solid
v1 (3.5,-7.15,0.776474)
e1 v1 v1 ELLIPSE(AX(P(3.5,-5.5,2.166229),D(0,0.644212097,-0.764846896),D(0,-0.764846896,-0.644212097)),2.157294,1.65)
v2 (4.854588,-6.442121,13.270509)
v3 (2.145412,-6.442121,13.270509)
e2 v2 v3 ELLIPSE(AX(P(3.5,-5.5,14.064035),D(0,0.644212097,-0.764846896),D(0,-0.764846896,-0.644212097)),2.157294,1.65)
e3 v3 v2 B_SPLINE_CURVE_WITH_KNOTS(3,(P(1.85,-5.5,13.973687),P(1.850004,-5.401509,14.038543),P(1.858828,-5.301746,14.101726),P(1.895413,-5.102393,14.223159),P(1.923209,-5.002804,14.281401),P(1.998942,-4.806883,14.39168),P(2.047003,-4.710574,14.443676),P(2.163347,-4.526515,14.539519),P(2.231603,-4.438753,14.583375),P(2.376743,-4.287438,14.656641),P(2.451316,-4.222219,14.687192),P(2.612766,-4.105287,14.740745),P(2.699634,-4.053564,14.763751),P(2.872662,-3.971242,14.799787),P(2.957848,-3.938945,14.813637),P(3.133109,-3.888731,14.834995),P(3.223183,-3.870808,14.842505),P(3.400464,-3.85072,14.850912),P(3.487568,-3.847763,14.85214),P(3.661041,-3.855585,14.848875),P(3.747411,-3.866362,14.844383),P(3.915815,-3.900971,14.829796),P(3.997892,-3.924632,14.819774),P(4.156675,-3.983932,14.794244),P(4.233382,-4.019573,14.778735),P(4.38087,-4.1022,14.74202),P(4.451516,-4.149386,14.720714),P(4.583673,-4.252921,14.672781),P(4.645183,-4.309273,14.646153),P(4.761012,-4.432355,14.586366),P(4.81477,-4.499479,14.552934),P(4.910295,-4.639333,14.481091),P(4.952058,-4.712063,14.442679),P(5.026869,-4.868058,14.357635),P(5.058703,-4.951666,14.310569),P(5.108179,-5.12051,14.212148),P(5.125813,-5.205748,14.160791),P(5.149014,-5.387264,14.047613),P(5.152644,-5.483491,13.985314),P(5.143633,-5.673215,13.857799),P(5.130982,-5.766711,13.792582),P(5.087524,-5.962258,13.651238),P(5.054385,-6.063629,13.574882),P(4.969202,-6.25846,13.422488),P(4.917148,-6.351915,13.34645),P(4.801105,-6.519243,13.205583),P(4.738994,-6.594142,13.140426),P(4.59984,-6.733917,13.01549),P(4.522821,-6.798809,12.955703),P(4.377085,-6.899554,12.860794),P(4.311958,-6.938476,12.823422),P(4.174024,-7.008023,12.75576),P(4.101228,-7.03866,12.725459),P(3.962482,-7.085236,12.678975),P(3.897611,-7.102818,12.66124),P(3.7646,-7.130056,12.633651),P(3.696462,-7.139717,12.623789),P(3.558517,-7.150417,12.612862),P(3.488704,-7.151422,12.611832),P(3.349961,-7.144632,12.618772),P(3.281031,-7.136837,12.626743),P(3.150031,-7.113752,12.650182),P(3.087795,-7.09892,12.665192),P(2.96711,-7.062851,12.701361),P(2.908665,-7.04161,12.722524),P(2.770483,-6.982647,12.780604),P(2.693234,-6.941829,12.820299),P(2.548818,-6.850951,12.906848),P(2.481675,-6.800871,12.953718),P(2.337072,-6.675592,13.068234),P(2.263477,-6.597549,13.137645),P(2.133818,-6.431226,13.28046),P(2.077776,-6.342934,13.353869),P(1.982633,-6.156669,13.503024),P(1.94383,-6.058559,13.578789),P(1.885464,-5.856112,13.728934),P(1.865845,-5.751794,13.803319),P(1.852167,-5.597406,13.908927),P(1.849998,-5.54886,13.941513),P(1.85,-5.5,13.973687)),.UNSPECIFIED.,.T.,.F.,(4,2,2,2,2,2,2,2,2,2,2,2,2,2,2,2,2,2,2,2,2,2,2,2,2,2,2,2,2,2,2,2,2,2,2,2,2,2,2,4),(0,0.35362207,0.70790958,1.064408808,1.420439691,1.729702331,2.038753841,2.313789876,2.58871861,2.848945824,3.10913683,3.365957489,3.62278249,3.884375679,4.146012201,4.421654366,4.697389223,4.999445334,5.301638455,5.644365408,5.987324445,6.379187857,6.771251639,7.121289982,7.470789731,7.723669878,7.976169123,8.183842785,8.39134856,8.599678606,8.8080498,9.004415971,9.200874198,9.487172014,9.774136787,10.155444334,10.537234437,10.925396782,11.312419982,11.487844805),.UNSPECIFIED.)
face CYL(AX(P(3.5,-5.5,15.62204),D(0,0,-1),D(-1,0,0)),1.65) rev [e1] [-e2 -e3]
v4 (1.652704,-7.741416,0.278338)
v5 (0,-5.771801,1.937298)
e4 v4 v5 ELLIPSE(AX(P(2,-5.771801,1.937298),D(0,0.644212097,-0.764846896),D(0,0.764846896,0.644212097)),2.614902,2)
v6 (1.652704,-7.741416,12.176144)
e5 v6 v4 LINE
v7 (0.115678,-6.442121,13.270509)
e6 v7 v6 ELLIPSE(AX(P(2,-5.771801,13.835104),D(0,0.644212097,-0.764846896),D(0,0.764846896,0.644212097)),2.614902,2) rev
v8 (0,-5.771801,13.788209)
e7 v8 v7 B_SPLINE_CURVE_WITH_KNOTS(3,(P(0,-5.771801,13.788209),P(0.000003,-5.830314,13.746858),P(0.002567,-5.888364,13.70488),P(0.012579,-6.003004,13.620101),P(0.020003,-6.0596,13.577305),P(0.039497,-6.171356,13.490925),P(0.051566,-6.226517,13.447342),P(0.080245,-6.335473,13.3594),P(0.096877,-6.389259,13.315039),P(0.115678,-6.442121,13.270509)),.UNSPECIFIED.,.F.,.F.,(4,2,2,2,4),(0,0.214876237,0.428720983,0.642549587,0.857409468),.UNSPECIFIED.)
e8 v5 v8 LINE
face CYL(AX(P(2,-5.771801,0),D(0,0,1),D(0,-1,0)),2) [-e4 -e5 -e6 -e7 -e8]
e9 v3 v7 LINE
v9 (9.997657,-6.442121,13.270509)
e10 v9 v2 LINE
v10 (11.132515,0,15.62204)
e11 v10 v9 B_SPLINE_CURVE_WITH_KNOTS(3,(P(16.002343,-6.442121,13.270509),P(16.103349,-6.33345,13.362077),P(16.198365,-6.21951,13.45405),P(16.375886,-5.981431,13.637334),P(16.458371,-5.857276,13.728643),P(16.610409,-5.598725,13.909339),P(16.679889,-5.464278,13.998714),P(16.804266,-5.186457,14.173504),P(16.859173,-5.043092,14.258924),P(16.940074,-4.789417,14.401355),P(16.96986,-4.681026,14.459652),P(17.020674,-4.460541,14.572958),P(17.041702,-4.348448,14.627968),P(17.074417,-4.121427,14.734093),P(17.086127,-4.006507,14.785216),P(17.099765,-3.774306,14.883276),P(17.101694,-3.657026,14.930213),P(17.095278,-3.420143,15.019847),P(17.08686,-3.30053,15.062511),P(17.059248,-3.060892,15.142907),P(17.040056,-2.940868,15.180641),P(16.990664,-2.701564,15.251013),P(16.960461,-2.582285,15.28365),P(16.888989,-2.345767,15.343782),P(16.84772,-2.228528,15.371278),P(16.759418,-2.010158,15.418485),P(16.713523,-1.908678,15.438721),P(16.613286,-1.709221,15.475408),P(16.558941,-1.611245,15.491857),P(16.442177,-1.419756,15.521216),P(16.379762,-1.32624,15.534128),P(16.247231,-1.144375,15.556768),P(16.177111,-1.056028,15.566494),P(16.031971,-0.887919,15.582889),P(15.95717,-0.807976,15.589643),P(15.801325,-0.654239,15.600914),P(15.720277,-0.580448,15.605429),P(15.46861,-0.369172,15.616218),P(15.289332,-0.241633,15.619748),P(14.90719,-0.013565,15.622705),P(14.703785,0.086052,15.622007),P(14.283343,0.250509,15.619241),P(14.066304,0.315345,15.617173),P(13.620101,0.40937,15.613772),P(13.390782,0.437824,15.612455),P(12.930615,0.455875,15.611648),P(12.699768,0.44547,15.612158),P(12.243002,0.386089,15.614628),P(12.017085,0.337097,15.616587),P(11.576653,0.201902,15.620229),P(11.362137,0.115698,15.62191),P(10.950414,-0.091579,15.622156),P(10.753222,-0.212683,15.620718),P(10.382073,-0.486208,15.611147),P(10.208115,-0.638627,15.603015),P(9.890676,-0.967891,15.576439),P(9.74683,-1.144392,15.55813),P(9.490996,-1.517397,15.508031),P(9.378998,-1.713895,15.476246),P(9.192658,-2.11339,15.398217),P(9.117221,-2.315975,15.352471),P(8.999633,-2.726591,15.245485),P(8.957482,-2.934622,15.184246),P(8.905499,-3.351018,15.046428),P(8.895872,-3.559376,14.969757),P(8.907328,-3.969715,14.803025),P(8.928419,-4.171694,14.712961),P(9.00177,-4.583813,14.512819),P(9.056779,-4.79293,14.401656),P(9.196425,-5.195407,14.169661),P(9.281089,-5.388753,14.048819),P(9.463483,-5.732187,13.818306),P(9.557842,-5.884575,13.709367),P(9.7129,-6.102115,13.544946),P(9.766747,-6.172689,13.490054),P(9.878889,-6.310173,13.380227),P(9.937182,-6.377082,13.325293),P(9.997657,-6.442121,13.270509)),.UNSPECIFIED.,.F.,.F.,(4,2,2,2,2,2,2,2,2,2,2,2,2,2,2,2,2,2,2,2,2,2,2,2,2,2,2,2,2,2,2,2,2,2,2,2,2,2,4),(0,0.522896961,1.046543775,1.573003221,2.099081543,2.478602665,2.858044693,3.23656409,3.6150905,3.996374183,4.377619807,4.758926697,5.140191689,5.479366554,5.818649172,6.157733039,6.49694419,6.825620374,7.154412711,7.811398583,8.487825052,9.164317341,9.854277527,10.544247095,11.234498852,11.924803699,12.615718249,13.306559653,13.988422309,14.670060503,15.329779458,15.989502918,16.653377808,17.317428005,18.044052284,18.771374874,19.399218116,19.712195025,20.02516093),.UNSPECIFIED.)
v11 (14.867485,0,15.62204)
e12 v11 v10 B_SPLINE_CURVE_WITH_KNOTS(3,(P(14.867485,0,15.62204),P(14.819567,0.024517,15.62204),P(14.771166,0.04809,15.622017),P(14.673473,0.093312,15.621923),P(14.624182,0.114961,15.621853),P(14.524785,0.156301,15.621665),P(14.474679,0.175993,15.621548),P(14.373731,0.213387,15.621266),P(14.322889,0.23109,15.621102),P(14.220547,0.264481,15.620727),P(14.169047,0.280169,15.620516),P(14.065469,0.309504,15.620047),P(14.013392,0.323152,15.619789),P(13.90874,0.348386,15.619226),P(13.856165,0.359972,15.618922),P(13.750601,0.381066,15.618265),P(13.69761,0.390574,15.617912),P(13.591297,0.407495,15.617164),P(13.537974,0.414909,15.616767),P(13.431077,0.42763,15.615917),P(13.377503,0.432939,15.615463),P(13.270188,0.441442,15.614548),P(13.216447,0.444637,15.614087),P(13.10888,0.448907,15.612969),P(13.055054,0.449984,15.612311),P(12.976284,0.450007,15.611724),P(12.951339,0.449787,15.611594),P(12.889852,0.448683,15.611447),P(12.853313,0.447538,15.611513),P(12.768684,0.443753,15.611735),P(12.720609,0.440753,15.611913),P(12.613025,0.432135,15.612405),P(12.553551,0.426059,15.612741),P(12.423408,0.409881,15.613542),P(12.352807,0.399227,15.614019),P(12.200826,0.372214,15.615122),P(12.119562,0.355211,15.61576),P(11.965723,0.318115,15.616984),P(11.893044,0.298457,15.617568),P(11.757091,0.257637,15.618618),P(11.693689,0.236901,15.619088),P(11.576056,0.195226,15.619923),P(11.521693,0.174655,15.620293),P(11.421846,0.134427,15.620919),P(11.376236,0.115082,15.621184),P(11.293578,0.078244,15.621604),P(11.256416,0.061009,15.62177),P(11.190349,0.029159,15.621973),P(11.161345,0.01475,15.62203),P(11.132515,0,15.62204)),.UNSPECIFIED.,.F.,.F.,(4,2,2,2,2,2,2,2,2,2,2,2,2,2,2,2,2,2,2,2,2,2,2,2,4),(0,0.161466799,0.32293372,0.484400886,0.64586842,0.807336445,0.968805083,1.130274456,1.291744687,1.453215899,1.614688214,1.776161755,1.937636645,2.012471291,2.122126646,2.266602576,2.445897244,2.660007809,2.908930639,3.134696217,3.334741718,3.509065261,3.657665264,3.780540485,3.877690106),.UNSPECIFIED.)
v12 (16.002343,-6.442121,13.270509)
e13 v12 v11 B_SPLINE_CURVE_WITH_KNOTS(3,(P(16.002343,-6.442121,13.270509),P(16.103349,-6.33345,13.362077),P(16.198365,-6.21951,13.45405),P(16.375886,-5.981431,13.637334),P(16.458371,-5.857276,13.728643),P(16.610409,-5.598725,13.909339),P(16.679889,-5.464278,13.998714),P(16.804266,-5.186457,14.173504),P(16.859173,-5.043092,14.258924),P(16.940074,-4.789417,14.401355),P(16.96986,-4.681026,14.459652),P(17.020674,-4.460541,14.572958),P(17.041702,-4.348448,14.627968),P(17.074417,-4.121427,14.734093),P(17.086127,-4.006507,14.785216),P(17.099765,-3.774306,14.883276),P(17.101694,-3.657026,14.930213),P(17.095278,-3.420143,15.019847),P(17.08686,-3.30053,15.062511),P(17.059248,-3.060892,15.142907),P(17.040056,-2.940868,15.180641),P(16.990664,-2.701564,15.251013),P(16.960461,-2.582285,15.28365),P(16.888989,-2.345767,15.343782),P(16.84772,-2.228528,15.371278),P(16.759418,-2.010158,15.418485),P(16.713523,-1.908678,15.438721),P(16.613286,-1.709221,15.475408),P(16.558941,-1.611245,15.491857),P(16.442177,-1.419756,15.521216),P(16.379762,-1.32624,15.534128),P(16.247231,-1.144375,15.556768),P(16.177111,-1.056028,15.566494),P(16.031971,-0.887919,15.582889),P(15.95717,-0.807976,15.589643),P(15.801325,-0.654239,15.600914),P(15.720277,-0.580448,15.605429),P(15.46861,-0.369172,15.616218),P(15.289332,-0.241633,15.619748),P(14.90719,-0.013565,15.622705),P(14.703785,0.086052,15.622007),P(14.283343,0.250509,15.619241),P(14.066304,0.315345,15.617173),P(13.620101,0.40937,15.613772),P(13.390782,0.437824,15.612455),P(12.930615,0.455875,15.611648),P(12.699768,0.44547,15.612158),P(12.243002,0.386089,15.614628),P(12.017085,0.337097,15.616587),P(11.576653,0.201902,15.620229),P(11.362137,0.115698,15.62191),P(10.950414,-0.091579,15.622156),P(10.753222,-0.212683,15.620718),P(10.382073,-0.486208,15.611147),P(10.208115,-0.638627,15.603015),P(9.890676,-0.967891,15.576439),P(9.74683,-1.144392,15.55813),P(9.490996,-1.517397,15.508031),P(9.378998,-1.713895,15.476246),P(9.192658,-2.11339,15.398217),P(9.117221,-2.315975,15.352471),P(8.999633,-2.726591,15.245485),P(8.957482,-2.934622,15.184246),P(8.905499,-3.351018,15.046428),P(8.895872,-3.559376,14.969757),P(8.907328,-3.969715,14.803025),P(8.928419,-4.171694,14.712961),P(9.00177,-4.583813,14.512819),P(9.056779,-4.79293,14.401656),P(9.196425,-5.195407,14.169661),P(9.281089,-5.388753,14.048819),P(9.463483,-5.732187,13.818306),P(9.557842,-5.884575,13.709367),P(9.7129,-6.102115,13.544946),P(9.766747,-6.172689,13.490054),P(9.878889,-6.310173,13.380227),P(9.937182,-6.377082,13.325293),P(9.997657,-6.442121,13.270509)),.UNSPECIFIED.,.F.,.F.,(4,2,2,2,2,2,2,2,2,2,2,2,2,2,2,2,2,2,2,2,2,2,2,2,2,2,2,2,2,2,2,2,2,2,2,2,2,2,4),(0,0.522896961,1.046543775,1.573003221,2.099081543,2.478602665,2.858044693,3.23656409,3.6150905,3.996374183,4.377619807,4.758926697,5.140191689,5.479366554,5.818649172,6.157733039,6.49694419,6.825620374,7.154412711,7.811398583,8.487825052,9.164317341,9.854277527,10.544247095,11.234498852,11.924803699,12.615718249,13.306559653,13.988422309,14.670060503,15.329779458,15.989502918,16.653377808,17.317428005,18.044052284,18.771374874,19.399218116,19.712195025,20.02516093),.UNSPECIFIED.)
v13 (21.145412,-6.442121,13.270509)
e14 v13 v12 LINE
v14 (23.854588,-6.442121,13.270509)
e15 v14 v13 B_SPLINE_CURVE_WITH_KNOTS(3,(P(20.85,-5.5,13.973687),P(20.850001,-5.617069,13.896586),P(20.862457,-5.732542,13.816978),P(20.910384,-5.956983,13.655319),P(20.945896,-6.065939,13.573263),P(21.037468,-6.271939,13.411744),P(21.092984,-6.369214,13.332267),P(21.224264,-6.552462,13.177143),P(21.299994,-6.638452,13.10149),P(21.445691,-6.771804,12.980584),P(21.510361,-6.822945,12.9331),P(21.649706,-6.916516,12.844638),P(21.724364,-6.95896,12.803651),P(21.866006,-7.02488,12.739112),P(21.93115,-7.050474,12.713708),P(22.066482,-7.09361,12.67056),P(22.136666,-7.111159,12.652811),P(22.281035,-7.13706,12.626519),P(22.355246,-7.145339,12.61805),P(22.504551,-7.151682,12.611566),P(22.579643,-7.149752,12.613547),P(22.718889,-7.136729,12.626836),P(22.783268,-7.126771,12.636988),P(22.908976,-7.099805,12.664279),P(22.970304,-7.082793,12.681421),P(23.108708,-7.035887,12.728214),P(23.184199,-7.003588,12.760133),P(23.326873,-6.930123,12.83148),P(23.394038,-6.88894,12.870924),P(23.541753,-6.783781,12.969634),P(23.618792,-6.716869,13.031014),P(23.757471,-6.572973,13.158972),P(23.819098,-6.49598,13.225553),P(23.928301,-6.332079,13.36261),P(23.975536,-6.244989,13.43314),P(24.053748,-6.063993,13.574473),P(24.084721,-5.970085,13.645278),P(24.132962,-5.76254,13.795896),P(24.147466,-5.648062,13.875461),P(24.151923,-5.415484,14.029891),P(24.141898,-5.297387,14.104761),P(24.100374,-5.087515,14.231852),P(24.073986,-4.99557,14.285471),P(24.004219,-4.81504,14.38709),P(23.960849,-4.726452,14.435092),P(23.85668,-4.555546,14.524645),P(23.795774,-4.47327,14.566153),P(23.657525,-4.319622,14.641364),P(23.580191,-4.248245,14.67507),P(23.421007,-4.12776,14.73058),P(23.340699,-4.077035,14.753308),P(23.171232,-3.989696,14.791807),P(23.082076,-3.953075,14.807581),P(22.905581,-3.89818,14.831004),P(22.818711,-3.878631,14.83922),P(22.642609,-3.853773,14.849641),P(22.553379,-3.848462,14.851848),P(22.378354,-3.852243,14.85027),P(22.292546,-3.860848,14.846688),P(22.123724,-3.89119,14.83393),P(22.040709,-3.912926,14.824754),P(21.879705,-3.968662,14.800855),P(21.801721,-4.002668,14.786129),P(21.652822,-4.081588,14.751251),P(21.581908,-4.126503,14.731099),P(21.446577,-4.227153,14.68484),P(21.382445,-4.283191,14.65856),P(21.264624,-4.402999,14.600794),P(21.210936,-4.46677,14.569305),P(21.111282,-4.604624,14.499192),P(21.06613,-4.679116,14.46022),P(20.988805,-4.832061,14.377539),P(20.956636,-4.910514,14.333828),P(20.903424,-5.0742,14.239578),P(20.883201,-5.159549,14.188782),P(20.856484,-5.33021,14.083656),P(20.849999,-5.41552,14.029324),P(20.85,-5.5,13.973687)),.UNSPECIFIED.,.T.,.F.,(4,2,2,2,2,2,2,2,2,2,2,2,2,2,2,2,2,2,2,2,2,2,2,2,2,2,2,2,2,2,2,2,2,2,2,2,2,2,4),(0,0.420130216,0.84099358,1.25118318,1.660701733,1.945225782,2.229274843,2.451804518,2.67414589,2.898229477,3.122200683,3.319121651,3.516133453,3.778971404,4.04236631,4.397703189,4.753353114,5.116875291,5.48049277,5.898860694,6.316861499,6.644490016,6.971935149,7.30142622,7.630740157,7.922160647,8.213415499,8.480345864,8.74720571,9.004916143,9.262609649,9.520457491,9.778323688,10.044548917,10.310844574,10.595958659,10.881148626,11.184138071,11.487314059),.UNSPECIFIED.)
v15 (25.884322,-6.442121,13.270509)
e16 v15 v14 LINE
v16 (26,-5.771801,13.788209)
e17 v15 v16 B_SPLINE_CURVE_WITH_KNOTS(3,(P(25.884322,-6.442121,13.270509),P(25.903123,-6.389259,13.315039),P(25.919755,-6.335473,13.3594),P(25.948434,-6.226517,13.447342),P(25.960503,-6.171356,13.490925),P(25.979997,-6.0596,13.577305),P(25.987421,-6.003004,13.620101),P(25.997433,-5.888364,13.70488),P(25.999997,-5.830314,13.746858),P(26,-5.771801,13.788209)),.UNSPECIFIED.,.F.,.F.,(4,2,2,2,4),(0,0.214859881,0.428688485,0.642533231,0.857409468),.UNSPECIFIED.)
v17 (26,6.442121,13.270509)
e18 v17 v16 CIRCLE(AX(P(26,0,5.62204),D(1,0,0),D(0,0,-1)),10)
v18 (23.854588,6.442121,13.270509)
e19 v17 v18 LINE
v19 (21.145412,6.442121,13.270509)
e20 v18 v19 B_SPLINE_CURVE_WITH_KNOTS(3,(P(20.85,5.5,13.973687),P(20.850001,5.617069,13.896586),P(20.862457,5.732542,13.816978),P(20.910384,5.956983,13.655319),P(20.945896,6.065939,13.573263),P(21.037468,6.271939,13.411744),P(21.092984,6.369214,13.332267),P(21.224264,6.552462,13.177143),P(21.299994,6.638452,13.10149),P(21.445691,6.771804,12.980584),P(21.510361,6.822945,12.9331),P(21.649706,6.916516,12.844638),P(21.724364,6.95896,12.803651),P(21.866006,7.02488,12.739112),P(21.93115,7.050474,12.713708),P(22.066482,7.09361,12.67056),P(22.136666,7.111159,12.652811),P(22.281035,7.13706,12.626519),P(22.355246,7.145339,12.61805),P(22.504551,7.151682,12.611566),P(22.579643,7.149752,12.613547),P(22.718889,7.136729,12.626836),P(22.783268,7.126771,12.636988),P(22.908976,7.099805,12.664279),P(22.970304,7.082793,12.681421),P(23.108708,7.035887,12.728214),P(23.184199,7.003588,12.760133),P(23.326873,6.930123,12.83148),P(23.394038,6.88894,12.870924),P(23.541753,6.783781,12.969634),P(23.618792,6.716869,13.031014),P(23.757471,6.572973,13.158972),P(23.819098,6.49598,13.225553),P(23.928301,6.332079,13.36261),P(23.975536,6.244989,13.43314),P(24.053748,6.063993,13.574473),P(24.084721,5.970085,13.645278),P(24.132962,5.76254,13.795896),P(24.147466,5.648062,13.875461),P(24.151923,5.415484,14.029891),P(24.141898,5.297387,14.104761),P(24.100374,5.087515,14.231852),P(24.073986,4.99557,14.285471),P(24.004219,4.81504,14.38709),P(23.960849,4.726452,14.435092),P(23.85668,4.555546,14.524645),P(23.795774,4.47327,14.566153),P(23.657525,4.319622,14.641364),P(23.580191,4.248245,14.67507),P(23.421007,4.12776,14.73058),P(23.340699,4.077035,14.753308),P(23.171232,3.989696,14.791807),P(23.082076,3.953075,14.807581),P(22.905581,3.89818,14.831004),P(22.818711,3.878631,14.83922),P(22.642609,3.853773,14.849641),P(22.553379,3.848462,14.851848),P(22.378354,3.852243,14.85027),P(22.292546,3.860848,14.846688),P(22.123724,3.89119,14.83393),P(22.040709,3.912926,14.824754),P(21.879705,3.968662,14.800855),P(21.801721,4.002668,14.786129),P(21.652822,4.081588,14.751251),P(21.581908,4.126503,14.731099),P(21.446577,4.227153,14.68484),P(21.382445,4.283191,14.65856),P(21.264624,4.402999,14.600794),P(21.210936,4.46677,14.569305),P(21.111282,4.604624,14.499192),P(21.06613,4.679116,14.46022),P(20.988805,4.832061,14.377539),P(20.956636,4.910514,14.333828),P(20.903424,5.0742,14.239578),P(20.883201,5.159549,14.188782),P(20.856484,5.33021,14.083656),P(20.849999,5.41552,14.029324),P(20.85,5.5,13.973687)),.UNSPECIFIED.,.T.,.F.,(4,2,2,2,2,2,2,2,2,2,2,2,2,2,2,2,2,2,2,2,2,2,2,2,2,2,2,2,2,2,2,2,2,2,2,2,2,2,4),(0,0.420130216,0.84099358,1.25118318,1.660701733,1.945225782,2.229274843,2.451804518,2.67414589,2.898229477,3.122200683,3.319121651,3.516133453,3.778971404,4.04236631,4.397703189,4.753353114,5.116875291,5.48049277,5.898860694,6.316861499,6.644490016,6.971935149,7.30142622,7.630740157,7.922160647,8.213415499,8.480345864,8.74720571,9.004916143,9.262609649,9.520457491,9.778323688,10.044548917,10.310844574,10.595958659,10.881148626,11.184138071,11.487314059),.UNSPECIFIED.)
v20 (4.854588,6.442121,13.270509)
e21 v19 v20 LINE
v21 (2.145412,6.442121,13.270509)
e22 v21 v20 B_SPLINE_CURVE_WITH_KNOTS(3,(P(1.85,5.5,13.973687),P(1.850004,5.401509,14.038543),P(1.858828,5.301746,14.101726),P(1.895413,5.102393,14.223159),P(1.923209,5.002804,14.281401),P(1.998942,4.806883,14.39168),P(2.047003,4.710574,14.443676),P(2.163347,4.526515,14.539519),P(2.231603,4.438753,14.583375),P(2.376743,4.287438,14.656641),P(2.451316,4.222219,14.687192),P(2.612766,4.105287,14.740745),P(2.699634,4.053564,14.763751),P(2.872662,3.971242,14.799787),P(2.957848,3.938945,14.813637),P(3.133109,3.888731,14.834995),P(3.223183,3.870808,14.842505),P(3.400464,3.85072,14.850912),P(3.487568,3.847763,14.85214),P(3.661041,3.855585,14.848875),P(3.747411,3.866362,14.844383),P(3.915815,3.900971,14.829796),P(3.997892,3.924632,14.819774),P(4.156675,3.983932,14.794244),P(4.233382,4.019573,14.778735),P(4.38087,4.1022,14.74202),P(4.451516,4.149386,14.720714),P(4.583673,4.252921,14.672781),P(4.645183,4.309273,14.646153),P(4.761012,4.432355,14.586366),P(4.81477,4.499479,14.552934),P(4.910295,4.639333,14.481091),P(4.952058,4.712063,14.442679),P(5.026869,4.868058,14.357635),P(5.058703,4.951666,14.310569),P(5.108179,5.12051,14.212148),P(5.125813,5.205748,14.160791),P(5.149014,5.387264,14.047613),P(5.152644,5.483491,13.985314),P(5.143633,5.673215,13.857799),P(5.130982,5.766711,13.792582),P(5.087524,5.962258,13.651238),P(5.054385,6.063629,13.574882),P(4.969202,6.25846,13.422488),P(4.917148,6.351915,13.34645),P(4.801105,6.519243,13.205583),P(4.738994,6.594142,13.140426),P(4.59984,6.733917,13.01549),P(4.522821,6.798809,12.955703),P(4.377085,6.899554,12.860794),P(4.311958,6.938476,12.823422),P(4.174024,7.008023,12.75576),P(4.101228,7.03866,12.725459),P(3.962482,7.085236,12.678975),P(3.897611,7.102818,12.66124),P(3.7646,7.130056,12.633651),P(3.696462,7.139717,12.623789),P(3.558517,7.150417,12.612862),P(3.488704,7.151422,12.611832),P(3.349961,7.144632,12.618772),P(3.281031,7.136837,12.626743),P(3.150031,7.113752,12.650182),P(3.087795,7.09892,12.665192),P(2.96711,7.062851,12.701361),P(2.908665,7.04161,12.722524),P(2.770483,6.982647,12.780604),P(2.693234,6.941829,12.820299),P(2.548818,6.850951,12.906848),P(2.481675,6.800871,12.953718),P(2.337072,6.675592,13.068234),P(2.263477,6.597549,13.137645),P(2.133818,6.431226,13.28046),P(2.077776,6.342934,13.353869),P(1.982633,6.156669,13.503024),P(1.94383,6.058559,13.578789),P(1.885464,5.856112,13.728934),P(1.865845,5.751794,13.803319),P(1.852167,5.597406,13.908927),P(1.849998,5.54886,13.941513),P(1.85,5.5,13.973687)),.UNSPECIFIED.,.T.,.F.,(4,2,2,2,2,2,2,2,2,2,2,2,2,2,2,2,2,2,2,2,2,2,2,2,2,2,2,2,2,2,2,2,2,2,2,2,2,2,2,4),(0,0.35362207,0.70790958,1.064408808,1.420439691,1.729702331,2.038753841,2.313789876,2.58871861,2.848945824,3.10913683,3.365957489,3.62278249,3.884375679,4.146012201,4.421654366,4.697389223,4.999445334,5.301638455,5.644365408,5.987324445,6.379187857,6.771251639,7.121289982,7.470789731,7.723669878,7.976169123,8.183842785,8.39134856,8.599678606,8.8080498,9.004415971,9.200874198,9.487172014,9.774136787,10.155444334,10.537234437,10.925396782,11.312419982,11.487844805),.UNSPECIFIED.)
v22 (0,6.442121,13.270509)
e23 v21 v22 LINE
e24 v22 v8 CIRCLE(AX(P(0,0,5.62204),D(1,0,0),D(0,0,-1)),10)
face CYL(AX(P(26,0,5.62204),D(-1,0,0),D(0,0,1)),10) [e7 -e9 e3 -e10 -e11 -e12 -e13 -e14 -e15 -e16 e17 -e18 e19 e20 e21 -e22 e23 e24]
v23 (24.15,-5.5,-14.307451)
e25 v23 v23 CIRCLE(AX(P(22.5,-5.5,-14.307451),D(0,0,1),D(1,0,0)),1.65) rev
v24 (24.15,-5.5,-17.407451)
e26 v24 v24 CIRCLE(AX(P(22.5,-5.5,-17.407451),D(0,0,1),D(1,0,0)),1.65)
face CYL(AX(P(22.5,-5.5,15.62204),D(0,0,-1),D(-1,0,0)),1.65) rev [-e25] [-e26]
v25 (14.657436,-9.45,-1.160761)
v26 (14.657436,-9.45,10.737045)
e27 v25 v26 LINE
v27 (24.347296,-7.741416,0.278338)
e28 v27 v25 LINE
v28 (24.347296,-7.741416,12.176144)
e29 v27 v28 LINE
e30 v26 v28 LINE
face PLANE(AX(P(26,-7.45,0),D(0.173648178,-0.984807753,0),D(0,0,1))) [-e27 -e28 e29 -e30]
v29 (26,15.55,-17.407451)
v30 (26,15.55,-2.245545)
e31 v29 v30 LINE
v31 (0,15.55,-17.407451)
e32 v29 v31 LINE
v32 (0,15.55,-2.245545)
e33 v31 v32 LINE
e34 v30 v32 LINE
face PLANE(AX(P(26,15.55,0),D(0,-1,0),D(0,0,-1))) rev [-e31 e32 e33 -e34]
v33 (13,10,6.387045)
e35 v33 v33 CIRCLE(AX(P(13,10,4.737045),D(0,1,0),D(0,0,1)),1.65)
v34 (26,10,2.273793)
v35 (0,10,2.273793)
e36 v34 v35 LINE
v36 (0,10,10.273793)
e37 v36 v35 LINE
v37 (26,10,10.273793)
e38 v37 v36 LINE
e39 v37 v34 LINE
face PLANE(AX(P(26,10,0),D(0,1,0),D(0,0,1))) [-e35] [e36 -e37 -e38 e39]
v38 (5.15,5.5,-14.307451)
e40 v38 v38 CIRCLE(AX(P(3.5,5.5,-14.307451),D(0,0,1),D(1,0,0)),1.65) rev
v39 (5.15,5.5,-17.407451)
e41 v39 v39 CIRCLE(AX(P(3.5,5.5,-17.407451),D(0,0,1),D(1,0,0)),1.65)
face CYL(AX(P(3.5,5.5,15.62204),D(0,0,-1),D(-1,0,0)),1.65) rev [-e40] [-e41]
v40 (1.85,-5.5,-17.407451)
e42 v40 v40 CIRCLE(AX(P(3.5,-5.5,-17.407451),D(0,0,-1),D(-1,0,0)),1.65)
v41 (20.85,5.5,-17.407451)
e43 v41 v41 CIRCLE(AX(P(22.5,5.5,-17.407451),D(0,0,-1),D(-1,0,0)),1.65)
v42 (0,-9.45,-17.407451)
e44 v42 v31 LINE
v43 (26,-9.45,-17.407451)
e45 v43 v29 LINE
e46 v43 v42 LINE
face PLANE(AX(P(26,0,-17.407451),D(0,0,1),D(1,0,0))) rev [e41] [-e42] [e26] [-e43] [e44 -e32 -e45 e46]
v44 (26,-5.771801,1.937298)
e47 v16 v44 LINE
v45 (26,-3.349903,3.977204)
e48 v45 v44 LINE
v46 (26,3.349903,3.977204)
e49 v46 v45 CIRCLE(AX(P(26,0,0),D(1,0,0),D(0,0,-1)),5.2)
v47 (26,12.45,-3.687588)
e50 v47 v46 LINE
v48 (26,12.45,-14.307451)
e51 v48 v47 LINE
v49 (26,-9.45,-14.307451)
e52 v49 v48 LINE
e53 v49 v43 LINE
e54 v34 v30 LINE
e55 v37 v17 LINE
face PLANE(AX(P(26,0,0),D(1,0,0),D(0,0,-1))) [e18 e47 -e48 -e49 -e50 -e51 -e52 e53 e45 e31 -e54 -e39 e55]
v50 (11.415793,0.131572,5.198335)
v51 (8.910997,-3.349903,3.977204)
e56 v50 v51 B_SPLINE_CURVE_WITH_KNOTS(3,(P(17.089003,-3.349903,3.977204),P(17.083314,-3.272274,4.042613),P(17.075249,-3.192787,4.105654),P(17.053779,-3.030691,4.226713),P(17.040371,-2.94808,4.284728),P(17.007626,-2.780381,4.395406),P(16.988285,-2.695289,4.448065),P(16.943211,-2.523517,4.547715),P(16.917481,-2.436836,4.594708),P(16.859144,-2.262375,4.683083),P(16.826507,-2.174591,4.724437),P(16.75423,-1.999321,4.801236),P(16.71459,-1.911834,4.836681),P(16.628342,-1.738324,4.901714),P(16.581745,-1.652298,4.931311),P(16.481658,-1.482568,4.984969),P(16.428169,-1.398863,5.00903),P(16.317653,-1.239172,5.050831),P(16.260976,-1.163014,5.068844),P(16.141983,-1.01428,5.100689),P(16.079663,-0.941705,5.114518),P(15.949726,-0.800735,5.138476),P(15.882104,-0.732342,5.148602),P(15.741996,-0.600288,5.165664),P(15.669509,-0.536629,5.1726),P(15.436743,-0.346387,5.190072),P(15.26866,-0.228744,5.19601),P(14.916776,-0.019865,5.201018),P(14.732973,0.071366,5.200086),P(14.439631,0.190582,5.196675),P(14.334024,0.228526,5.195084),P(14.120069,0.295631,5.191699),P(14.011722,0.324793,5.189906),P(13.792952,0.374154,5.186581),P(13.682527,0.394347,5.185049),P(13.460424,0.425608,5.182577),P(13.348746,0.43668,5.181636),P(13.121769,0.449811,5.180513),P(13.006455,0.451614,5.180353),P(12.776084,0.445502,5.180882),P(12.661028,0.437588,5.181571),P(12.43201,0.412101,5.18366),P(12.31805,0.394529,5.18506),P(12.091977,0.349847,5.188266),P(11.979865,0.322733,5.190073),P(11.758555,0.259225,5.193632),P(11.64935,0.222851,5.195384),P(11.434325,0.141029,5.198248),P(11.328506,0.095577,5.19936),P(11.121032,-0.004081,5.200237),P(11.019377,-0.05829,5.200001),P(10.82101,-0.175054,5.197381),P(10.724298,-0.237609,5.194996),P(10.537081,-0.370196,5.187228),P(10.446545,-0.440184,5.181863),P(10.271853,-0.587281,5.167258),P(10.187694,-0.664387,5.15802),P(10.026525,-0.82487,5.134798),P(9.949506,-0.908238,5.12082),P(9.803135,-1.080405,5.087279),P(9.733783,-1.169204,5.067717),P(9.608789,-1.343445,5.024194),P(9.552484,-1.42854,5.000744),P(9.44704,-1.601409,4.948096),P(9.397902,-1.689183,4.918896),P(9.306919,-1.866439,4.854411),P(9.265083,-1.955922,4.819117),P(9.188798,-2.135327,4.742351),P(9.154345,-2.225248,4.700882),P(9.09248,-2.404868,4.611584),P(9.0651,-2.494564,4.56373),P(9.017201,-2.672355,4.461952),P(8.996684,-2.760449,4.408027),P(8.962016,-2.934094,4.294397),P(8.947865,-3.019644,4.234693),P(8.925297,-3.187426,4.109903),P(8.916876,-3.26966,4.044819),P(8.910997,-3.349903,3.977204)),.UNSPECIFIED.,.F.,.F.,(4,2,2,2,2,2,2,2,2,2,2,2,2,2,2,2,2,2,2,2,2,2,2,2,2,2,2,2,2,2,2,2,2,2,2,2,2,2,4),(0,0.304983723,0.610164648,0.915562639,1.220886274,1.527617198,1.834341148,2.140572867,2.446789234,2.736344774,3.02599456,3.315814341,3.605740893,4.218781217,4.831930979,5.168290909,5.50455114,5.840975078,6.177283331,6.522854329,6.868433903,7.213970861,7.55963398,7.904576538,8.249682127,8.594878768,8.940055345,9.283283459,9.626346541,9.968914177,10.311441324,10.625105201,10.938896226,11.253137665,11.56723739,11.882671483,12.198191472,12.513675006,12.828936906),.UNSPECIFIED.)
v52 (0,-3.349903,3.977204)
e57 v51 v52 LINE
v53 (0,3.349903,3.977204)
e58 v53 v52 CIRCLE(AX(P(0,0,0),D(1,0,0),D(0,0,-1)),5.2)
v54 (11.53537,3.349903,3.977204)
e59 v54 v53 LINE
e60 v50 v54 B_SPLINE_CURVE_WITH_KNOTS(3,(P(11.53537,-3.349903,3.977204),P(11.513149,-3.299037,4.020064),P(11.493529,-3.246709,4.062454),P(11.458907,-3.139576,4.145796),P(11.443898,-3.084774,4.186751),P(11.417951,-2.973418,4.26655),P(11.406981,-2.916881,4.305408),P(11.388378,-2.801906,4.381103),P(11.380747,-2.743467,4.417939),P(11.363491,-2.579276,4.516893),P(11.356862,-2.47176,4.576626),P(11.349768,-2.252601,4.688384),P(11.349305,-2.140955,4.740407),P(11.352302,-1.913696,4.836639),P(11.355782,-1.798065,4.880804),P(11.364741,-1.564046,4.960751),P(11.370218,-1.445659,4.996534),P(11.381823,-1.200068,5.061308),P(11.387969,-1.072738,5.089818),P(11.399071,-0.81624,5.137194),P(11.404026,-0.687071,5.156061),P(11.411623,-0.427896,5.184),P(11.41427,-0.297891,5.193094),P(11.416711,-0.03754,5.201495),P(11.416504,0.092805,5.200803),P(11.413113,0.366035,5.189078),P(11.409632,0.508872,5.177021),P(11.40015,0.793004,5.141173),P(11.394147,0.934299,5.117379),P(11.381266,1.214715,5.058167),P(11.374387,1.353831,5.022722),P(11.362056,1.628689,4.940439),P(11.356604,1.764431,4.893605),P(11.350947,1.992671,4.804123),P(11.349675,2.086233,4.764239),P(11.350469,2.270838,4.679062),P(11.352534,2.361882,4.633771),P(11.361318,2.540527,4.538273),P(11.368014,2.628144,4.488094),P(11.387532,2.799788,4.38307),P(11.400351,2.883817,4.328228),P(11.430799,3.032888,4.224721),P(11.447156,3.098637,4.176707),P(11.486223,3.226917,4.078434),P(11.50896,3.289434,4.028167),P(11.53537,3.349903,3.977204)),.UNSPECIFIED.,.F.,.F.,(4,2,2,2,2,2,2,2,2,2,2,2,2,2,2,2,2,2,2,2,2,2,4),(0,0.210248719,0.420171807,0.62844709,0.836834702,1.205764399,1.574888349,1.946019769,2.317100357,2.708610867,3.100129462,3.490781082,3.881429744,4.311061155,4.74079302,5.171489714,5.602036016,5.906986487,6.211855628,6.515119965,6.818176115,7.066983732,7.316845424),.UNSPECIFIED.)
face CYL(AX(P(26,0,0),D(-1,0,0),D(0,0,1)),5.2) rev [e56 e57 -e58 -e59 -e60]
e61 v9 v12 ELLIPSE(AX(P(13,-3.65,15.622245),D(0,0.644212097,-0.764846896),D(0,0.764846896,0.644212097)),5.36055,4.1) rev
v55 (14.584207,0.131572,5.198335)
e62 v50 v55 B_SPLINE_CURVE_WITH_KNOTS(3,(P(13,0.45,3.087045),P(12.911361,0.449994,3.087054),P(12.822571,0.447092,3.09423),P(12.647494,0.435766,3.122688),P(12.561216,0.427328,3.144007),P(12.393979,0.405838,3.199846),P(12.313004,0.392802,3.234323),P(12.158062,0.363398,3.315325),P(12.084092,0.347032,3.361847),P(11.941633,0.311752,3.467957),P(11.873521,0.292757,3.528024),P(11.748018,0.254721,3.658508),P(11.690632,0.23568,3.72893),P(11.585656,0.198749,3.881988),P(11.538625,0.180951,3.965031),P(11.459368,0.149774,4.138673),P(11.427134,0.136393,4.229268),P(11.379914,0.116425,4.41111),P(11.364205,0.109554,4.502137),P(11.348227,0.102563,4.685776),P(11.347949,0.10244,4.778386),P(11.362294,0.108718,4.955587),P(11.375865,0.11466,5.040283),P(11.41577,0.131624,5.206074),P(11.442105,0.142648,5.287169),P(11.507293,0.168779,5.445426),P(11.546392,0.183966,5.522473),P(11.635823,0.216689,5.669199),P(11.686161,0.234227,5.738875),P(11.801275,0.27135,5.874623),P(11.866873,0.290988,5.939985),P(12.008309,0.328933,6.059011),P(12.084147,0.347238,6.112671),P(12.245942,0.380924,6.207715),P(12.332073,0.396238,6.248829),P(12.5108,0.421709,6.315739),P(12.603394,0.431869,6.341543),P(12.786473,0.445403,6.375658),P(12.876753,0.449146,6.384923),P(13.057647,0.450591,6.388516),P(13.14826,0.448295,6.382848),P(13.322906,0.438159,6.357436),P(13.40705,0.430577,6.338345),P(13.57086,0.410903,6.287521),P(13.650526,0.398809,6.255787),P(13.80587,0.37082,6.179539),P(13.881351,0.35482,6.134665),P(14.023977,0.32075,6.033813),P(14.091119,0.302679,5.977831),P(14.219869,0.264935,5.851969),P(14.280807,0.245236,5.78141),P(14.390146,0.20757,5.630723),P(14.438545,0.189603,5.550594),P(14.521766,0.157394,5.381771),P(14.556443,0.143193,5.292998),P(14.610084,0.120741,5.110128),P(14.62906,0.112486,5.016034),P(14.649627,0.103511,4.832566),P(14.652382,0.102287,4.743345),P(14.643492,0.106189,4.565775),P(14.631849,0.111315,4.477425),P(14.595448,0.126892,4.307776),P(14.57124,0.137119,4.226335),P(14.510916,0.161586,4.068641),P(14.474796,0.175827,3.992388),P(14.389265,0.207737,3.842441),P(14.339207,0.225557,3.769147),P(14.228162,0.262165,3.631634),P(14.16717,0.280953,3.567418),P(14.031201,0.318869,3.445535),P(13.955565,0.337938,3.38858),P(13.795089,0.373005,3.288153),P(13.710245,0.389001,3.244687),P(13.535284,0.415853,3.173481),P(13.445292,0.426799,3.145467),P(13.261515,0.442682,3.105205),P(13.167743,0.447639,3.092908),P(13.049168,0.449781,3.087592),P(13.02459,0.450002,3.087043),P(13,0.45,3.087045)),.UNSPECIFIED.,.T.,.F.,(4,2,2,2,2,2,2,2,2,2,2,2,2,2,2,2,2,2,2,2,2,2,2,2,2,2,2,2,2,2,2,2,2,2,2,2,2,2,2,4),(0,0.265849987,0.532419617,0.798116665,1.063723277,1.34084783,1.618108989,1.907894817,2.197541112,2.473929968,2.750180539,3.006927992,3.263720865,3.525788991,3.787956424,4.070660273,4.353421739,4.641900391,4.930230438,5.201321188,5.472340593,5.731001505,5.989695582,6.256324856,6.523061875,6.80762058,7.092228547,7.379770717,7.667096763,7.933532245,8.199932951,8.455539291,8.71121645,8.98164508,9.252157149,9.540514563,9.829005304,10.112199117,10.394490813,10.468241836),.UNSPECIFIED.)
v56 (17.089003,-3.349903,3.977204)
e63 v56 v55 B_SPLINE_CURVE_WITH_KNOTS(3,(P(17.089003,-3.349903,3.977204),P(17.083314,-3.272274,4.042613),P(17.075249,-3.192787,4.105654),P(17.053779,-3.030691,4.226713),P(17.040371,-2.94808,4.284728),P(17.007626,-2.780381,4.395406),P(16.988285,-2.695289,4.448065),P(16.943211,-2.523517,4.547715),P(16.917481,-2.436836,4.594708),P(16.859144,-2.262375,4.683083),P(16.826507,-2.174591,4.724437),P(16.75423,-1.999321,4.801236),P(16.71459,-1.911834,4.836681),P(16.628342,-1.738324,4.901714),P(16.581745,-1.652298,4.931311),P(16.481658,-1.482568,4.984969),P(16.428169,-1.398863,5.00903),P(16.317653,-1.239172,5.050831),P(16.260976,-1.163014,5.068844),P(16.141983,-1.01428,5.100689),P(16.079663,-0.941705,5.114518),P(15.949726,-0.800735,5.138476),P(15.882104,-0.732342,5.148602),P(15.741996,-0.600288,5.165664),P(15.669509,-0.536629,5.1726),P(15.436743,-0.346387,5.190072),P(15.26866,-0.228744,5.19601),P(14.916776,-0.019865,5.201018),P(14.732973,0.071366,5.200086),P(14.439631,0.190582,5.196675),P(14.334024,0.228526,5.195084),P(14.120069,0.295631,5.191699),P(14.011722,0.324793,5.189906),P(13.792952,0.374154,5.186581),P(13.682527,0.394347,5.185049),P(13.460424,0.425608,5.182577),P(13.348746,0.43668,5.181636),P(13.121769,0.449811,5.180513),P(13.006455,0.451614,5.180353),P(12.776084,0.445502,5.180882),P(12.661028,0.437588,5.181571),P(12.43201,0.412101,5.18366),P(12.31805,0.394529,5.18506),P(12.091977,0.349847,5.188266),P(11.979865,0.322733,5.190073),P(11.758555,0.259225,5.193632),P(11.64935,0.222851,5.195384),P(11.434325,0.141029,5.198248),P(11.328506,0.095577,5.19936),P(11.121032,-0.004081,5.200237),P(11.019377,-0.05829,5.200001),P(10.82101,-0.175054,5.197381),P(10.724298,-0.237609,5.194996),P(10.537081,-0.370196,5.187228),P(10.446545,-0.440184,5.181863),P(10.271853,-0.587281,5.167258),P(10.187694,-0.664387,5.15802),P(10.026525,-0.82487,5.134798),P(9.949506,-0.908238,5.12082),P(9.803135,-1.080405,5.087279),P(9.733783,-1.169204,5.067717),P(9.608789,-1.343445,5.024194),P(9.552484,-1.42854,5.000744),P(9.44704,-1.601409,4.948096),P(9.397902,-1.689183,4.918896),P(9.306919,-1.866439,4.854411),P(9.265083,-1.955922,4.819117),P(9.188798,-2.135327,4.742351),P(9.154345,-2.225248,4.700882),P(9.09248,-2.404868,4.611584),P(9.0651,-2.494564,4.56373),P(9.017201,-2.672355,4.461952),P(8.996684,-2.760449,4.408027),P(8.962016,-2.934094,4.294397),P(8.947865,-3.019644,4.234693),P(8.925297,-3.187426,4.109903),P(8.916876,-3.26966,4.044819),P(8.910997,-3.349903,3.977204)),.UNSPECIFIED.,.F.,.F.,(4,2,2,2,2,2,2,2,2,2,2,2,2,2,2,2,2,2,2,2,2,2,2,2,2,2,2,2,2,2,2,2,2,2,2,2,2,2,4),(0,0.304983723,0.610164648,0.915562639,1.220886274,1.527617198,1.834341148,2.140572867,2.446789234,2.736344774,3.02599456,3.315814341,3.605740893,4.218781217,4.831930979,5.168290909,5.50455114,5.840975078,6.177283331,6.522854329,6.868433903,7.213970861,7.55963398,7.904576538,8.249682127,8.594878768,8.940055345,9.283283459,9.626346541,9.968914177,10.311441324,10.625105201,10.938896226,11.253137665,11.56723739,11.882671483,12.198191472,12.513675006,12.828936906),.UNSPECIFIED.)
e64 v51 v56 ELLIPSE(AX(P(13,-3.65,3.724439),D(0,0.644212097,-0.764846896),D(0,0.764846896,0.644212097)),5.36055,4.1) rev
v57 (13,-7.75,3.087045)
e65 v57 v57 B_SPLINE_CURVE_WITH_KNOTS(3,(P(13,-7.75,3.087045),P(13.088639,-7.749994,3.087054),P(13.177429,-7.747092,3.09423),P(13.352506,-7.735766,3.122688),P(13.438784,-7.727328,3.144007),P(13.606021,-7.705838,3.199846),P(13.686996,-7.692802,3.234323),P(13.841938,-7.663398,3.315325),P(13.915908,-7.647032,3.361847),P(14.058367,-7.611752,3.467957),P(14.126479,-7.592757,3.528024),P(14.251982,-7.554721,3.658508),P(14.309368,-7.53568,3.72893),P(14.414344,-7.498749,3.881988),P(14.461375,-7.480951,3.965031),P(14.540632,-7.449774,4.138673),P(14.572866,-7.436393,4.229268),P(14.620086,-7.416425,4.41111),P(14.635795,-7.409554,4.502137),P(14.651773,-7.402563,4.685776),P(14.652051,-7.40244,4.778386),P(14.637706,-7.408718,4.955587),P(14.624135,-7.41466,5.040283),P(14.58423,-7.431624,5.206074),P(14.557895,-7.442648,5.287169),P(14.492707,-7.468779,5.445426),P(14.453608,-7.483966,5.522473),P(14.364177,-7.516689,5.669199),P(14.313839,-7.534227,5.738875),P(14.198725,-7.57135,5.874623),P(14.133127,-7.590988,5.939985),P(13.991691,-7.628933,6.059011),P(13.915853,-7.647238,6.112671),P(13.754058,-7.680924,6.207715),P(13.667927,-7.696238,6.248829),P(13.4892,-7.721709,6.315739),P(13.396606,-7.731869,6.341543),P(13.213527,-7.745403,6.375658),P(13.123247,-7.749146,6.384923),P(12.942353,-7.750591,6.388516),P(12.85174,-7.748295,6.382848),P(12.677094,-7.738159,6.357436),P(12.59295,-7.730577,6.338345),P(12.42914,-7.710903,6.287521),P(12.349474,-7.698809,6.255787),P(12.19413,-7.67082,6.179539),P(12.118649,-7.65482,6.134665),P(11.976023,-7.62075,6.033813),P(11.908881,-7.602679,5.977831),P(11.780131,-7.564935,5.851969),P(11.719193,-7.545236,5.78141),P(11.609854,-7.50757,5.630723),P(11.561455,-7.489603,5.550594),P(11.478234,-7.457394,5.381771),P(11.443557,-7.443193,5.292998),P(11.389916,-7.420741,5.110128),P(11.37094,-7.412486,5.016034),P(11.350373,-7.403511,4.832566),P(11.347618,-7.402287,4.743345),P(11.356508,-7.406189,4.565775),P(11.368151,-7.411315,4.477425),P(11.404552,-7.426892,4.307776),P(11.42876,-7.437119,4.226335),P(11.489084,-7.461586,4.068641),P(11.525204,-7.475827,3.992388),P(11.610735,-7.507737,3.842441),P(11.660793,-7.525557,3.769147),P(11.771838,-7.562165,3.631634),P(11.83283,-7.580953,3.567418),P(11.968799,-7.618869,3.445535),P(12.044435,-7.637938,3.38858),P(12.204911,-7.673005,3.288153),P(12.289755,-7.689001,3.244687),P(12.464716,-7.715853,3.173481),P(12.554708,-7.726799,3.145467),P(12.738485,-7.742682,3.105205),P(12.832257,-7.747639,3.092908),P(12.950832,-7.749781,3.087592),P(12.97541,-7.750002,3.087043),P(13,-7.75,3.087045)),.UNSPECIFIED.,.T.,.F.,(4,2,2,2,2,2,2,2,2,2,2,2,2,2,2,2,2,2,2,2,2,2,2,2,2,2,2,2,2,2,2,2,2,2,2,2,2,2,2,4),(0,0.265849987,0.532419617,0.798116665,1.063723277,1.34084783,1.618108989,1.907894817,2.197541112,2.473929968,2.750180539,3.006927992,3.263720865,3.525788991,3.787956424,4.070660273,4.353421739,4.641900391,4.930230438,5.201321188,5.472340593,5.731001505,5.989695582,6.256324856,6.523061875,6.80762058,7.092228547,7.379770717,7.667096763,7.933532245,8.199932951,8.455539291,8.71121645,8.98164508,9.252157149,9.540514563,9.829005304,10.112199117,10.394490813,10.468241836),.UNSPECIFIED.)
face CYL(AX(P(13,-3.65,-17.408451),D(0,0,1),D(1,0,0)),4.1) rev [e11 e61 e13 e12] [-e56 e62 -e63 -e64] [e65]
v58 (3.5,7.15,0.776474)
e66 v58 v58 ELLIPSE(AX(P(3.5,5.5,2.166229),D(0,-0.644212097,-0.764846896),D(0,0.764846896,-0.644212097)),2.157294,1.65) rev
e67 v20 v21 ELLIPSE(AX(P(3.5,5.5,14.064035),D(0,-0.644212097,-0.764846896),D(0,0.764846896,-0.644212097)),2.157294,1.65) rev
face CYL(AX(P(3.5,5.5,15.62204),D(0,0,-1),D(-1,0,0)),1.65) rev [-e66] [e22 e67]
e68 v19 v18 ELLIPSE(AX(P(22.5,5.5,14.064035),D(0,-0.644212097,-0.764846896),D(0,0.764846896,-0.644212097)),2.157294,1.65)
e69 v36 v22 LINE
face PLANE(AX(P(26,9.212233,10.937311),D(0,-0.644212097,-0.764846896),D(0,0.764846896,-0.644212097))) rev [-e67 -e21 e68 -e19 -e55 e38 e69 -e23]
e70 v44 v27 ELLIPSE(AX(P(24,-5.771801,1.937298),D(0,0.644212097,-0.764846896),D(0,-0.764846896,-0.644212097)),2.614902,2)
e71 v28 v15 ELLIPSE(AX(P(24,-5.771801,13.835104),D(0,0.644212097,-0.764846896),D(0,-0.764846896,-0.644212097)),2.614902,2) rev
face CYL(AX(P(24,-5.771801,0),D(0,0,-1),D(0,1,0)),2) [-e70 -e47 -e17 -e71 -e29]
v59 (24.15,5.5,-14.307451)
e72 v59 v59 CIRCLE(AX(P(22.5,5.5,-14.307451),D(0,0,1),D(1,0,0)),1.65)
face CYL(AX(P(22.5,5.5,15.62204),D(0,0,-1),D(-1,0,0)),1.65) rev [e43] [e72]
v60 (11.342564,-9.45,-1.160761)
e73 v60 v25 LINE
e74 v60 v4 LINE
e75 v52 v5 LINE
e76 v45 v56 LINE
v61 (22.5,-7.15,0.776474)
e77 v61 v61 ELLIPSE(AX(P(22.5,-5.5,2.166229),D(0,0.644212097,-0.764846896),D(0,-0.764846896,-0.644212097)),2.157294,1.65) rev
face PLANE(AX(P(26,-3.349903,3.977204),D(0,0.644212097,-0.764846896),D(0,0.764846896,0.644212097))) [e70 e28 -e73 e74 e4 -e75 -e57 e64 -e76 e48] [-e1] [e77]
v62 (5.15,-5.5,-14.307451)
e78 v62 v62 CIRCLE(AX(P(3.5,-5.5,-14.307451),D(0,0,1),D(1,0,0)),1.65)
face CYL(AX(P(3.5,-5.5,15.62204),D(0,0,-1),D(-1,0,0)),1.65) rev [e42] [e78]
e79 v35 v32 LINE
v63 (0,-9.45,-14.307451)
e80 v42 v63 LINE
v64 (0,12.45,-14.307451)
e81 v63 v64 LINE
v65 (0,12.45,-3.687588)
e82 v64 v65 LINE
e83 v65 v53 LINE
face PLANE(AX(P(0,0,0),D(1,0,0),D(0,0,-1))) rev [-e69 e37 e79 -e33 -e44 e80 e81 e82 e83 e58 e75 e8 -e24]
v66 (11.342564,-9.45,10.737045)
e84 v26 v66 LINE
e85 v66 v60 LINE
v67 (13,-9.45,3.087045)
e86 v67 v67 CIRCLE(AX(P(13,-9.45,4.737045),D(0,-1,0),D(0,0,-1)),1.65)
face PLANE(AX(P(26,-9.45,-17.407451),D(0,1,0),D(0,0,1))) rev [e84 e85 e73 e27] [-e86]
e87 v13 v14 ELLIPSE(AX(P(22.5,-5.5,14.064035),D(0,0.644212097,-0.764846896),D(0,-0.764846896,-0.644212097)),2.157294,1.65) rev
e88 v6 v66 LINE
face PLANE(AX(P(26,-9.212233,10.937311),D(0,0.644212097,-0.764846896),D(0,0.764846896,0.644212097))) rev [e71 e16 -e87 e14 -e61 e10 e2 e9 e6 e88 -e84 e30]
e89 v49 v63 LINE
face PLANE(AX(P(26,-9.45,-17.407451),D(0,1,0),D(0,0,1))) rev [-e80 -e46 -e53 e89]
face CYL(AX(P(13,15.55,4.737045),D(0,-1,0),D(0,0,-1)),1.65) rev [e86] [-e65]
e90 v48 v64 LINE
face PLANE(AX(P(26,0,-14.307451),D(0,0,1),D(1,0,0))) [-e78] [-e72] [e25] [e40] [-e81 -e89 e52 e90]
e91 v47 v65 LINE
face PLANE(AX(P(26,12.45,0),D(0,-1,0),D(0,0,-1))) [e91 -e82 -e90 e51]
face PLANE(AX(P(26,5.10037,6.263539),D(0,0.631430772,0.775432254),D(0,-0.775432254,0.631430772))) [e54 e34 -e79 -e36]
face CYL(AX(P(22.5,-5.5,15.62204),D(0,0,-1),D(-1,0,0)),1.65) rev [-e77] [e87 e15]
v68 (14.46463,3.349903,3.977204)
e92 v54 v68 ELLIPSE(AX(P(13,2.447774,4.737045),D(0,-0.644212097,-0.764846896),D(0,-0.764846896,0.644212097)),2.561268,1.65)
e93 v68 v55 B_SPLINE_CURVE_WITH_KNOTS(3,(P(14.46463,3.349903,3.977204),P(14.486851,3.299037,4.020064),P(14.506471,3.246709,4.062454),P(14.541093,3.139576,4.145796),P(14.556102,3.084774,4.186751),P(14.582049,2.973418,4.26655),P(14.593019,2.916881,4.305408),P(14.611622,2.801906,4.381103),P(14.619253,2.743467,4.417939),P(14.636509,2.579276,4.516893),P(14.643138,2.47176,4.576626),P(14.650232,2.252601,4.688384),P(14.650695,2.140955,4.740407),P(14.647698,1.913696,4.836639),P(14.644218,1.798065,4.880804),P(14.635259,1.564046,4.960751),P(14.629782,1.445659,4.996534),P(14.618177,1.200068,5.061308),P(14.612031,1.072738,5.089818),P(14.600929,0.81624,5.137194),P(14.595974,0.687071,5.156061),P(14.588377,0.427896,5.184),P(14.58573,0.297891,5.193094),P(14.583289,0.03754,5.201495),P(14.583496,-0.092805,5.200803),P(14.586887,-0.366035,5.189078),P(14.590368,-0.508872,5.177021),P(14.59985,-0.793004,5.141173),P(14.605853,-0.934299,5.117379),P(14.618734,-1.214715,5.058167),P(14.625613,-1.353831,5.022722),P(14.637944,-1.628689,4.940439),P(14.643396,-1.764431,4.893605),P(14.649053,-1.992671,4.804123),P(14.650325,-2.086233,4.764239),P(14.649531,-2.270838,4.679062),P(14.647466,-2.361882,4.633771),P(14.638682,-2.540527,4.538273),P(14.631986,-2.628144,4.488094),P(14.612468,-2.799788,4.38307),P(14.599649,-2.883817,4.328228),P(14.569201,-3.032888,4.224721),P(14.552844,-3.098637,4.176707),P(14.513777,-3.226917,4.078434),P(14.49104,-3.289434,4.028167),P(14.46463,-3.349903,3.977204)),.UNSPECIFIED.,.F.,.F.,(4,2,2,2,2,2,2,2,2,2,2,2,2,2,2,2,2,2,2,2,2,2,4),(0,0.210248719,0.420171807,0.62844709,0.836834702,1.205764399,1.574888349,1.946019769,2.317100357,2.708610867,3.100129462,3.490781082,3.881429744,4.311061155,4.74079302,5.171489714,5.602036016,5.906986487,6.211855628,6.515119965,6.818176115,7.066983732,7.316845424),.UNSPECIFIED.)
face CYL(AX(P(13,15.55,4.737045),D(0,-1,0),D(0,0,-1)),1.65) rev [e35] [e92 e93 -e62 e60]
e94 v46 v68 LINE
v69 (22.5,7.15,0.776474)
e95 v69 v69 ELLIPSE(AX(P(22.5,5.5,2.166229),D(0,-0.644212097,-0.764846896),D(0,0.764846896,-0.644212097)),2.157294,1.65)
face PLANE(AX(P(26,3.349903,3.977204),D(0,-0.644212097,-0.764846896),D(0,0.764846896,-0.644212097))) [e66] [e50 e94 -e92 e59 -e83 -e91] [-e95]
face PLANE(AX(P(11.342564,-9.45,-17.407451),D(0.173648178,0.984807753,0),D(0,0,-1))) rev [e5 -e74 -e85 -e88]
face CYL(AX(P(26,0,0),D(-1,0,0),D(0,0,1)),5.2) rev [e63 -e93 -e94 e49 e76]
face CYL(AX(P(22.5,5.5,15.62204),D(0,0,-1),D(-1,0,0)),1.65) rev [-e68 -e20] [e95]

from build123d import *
from OCP.BRepFilletAPI import BRepFilletAPI_MakeChamfer

# Parameters (mm, degrees)
EXTRUDE_1_DEPTH     = 26
SKETCH_2_R          = 1.65
CUT_EXTRUDE_1_DEPTH = 45.819078563
SKETCH_3_W          = 28.1444964
SKETCH_3_H          = 6.1
CUT_EXTRUDE_2_DEPTH = 35.940261345
CUT_EXTRUDE_4_REACH = 46.819
SKETCH_5_R          = 4.1
SKETCH_6_R          = 1.65
CUT_EXTRUDE_5_DEPTH = 41.050210522
CHAMFER_1_SIZE      = 2
CHAMFER_1_SIZE2     = 11.342563639
FILLET_1_R          = 2


with BuildPart() as part:
    # 草图1 → 凸台-拉伸1 (new body)
    with BuildSketch(Plane(origin=(0, 0, 0), x_dir=(0, 0, -1), z_dir=(1, 0, 0))):
        with BuildLine():
            Line((17.407451211, 15.55), (2.245544981, 15.55))
            Line((2.245544981, 15.55), (-2.273793452, 10))
            Line((-2.273793452, 10), (-10.273793452, 10))
            Line((-10.273793452, 10), (-13.270509165, 6.44212097))
            ThreePointArc((-13.270509165, 6.44212097), (-15.622040206, 0), (-13.270509165, -6.44212097))
            Line((-13.270509165, -6.44212097), (-10.273793452, -10))
            Line((-10.273793452, -10), (-2.273793452, -10))
            Line((-2.273793452, -10), (2.245544981, -15.55))
            Line((2.245544981, -15.55), (17.407451211, -15.55))
            Line((17.407451211, -15.55), (17.407451211, 15.55))
        make_face()
        with BuildLine():
            Line((3.687588487, 12.45), (14.307451211, 12.45))
            Line((14.307451211, 12.45), (14.307451211, -12.45))
            Line((14.307451211, -12.45), (3.687588487, -12.45))
            Line((3.687588487, -12.45), (-3.977203858, -3.349902904))
            ThreePointArc((-3.977203858, -3.349902904), (-5.2, 0), (-3.977203858, 3.349902904))
            Line((-3.977203858, 3.349902904), (3.687588487, 12.45))
        make_face(mode=Mode.SUBTRACT)
    extrude(amount=EXTRUDE_1_DEPTH)

    # 草图2 → 切除-拉伸1 (cut, through all)
    with BuildSketch(Plane(origin=(0, 0, -17.407451211), x_dir=(-1, 0, 0), z_dir=(0, 0, -1))):
        with Locations((-22.5, 5.5)):
            Circle(SKETCH_2_R)
        with Locations(Location((-22.5, -5.5, 0), (0, 0, 325.181239638))):
            Circle(SKETCH_2_R)
        with Locations(Location((-3.5, -5.5, 0), (0, 0, 325.181239638))):
            Circle(SKETCH_2_R)
        with Locations(Location((-3.5, 5.5, 0), (0, 0, 180))):
            Circle(SKETCH_2_R)
    extrude(amount=-CUT_EXTRUDE_1_DEPTH, mode=Mode.SUBTRACT)

    # 草图3 → 切除-拉伸2 (cut, through all)
    with BuildSketch(Plane.ZY):
        with Locations((-3.335203011, -12.5)):
            Rectangle(SKETCH_3_W, SKETCH_3_H)
    extrude(amount=-CUT_EXTRUDE_2_DEPTH, mode=Mode.SUBTRACT)

    # 草图5 → 切除-拉伸4 (cut, up to next)
    with BuildSketch(Plane.XY.offset(15.622040206), mode=Mode.PRIVATE) as cut_extrude_4_sk1:
        with Locations(Location((13, -3.65, 0), (0, 0, 4.197484636))):
            Circle(SKETCH_5_R)
    cut_extrude_4_tool1 = extrude(cut_extrude_4_sk1.sketch, amount=-CUT_EXTRUDE_4_REACH, mode=Mode.PRIVATE) & part.part
    add(cut_extrude_4_tool1.solids().sort_by_distance((13, -3.65, 15.62204))[0], mode=Mode.SUBTRACT)

    # 草图6 → 切除-拉伸5 (cut, through all)
    with BuildSketch(Plane.XZ.offset(9.45)):
        with Locations(Location((13, 4.737045189, 0), (0, 0, 270))):
            Circle(SKETCH_6_R)
    extrude(amount=-CUT_EXTRUDE_5_DEPTH, mode=Mode.SUBTRACT)

    # 倒角1: one chamfer whose edges measure the first distance from different faces: ONE call of the kernel's chamfer builder (chamfer() names one face for all edges)
    chamfer_1_edges_1 = [part.edges().sort_by_distance(p)[0] for p in [
        (0, -9.45, 4.78814218),
    ]]
    chamfer_1_side_1 = [part.faces().sort_by_distance(p)[0] for p in [
        (0, -9.035760057, -15.857451211),
    ]]
    chamfer_1_edges_2 = [part.edges().sort_by_distance(p)[0] for p in [
        (26, -9.45, 4.78814218),
    ]]
    chamfer_1_side_2 = [part.faces().sort_by_distance(p)[0] for p in [
        (26, -9.035760057, -15.857451211),
    ]]
    chamfer_1 = BRepFilletAPI_MakeChamfer(part.part.solid().wrapped)
    for e in chamfer_1_edges_1:
        chamfer_1.Add(CHAMFER_1_SIZE, CHAMFER_1_SIZE2, e.wrapped, chamfer_1_side_1[0].wrapped)  # the first distance lies on this face
    for e in chamfer_1_edges_2:
        chamfer_1.Add(CHAMFER_1_SIZE, CHAMFER_1_SIZE2, e.wrapped, chamfer_1_side_2[0].wrapped)  # the first distance lies on this face
    add(Compound.cast(chamfer_1.Shape()), mode=Mode.REPLACE)

    # 圆角1
    # the kernel refuses this fillet: 2 mm, written as the material it takes off along each edge
    with BuildSketch(Plane(origin=(26, -7.45, -3.671707212), x_dir=(-0.9848077530122086, -0.17364817766692747, 0), z_dir=(0, 0, 1))) as fillet_1_piece_1:
        with BuildLine():
            CenterArc((FILLET_1_R * 0.839099631177, -FILLET_1_R), FILLET_1_R, 90, 80)
            Line((-FILLET_1_R * 0.145708121835, -FILLET_1_R * 0.826351822333), (0, 0))
            Line((0, 0), (FILLET_1_R * 0.839099631177, 0))
        make_face()
    extrude(amount=20.288802329, mode=Mode.SUBTRACT)
    with BuildSketch(Plane(origin=(0, -7.45, 16.617095117), x_dir=(0, 1, 0), z_dir=(0, 0, -1))) as fillet_1_piece_2:
        with BuildLine():
            CenterArc((FILLET_1_R * 0.839099631177, FILLET_1_R), FILLET_1_R, 190, 80)
            Line((-FILLET_1_R * 0.145708121835, FILLET_1_R * 0.826351822333), (0, 0))
            Line((0, 0), (FILLET_1_R * 0.839099631177, 0))
        make_face()
    extrude(amount=20.288802329, mode=Mode.SUBTRACT)


solid = part.part
